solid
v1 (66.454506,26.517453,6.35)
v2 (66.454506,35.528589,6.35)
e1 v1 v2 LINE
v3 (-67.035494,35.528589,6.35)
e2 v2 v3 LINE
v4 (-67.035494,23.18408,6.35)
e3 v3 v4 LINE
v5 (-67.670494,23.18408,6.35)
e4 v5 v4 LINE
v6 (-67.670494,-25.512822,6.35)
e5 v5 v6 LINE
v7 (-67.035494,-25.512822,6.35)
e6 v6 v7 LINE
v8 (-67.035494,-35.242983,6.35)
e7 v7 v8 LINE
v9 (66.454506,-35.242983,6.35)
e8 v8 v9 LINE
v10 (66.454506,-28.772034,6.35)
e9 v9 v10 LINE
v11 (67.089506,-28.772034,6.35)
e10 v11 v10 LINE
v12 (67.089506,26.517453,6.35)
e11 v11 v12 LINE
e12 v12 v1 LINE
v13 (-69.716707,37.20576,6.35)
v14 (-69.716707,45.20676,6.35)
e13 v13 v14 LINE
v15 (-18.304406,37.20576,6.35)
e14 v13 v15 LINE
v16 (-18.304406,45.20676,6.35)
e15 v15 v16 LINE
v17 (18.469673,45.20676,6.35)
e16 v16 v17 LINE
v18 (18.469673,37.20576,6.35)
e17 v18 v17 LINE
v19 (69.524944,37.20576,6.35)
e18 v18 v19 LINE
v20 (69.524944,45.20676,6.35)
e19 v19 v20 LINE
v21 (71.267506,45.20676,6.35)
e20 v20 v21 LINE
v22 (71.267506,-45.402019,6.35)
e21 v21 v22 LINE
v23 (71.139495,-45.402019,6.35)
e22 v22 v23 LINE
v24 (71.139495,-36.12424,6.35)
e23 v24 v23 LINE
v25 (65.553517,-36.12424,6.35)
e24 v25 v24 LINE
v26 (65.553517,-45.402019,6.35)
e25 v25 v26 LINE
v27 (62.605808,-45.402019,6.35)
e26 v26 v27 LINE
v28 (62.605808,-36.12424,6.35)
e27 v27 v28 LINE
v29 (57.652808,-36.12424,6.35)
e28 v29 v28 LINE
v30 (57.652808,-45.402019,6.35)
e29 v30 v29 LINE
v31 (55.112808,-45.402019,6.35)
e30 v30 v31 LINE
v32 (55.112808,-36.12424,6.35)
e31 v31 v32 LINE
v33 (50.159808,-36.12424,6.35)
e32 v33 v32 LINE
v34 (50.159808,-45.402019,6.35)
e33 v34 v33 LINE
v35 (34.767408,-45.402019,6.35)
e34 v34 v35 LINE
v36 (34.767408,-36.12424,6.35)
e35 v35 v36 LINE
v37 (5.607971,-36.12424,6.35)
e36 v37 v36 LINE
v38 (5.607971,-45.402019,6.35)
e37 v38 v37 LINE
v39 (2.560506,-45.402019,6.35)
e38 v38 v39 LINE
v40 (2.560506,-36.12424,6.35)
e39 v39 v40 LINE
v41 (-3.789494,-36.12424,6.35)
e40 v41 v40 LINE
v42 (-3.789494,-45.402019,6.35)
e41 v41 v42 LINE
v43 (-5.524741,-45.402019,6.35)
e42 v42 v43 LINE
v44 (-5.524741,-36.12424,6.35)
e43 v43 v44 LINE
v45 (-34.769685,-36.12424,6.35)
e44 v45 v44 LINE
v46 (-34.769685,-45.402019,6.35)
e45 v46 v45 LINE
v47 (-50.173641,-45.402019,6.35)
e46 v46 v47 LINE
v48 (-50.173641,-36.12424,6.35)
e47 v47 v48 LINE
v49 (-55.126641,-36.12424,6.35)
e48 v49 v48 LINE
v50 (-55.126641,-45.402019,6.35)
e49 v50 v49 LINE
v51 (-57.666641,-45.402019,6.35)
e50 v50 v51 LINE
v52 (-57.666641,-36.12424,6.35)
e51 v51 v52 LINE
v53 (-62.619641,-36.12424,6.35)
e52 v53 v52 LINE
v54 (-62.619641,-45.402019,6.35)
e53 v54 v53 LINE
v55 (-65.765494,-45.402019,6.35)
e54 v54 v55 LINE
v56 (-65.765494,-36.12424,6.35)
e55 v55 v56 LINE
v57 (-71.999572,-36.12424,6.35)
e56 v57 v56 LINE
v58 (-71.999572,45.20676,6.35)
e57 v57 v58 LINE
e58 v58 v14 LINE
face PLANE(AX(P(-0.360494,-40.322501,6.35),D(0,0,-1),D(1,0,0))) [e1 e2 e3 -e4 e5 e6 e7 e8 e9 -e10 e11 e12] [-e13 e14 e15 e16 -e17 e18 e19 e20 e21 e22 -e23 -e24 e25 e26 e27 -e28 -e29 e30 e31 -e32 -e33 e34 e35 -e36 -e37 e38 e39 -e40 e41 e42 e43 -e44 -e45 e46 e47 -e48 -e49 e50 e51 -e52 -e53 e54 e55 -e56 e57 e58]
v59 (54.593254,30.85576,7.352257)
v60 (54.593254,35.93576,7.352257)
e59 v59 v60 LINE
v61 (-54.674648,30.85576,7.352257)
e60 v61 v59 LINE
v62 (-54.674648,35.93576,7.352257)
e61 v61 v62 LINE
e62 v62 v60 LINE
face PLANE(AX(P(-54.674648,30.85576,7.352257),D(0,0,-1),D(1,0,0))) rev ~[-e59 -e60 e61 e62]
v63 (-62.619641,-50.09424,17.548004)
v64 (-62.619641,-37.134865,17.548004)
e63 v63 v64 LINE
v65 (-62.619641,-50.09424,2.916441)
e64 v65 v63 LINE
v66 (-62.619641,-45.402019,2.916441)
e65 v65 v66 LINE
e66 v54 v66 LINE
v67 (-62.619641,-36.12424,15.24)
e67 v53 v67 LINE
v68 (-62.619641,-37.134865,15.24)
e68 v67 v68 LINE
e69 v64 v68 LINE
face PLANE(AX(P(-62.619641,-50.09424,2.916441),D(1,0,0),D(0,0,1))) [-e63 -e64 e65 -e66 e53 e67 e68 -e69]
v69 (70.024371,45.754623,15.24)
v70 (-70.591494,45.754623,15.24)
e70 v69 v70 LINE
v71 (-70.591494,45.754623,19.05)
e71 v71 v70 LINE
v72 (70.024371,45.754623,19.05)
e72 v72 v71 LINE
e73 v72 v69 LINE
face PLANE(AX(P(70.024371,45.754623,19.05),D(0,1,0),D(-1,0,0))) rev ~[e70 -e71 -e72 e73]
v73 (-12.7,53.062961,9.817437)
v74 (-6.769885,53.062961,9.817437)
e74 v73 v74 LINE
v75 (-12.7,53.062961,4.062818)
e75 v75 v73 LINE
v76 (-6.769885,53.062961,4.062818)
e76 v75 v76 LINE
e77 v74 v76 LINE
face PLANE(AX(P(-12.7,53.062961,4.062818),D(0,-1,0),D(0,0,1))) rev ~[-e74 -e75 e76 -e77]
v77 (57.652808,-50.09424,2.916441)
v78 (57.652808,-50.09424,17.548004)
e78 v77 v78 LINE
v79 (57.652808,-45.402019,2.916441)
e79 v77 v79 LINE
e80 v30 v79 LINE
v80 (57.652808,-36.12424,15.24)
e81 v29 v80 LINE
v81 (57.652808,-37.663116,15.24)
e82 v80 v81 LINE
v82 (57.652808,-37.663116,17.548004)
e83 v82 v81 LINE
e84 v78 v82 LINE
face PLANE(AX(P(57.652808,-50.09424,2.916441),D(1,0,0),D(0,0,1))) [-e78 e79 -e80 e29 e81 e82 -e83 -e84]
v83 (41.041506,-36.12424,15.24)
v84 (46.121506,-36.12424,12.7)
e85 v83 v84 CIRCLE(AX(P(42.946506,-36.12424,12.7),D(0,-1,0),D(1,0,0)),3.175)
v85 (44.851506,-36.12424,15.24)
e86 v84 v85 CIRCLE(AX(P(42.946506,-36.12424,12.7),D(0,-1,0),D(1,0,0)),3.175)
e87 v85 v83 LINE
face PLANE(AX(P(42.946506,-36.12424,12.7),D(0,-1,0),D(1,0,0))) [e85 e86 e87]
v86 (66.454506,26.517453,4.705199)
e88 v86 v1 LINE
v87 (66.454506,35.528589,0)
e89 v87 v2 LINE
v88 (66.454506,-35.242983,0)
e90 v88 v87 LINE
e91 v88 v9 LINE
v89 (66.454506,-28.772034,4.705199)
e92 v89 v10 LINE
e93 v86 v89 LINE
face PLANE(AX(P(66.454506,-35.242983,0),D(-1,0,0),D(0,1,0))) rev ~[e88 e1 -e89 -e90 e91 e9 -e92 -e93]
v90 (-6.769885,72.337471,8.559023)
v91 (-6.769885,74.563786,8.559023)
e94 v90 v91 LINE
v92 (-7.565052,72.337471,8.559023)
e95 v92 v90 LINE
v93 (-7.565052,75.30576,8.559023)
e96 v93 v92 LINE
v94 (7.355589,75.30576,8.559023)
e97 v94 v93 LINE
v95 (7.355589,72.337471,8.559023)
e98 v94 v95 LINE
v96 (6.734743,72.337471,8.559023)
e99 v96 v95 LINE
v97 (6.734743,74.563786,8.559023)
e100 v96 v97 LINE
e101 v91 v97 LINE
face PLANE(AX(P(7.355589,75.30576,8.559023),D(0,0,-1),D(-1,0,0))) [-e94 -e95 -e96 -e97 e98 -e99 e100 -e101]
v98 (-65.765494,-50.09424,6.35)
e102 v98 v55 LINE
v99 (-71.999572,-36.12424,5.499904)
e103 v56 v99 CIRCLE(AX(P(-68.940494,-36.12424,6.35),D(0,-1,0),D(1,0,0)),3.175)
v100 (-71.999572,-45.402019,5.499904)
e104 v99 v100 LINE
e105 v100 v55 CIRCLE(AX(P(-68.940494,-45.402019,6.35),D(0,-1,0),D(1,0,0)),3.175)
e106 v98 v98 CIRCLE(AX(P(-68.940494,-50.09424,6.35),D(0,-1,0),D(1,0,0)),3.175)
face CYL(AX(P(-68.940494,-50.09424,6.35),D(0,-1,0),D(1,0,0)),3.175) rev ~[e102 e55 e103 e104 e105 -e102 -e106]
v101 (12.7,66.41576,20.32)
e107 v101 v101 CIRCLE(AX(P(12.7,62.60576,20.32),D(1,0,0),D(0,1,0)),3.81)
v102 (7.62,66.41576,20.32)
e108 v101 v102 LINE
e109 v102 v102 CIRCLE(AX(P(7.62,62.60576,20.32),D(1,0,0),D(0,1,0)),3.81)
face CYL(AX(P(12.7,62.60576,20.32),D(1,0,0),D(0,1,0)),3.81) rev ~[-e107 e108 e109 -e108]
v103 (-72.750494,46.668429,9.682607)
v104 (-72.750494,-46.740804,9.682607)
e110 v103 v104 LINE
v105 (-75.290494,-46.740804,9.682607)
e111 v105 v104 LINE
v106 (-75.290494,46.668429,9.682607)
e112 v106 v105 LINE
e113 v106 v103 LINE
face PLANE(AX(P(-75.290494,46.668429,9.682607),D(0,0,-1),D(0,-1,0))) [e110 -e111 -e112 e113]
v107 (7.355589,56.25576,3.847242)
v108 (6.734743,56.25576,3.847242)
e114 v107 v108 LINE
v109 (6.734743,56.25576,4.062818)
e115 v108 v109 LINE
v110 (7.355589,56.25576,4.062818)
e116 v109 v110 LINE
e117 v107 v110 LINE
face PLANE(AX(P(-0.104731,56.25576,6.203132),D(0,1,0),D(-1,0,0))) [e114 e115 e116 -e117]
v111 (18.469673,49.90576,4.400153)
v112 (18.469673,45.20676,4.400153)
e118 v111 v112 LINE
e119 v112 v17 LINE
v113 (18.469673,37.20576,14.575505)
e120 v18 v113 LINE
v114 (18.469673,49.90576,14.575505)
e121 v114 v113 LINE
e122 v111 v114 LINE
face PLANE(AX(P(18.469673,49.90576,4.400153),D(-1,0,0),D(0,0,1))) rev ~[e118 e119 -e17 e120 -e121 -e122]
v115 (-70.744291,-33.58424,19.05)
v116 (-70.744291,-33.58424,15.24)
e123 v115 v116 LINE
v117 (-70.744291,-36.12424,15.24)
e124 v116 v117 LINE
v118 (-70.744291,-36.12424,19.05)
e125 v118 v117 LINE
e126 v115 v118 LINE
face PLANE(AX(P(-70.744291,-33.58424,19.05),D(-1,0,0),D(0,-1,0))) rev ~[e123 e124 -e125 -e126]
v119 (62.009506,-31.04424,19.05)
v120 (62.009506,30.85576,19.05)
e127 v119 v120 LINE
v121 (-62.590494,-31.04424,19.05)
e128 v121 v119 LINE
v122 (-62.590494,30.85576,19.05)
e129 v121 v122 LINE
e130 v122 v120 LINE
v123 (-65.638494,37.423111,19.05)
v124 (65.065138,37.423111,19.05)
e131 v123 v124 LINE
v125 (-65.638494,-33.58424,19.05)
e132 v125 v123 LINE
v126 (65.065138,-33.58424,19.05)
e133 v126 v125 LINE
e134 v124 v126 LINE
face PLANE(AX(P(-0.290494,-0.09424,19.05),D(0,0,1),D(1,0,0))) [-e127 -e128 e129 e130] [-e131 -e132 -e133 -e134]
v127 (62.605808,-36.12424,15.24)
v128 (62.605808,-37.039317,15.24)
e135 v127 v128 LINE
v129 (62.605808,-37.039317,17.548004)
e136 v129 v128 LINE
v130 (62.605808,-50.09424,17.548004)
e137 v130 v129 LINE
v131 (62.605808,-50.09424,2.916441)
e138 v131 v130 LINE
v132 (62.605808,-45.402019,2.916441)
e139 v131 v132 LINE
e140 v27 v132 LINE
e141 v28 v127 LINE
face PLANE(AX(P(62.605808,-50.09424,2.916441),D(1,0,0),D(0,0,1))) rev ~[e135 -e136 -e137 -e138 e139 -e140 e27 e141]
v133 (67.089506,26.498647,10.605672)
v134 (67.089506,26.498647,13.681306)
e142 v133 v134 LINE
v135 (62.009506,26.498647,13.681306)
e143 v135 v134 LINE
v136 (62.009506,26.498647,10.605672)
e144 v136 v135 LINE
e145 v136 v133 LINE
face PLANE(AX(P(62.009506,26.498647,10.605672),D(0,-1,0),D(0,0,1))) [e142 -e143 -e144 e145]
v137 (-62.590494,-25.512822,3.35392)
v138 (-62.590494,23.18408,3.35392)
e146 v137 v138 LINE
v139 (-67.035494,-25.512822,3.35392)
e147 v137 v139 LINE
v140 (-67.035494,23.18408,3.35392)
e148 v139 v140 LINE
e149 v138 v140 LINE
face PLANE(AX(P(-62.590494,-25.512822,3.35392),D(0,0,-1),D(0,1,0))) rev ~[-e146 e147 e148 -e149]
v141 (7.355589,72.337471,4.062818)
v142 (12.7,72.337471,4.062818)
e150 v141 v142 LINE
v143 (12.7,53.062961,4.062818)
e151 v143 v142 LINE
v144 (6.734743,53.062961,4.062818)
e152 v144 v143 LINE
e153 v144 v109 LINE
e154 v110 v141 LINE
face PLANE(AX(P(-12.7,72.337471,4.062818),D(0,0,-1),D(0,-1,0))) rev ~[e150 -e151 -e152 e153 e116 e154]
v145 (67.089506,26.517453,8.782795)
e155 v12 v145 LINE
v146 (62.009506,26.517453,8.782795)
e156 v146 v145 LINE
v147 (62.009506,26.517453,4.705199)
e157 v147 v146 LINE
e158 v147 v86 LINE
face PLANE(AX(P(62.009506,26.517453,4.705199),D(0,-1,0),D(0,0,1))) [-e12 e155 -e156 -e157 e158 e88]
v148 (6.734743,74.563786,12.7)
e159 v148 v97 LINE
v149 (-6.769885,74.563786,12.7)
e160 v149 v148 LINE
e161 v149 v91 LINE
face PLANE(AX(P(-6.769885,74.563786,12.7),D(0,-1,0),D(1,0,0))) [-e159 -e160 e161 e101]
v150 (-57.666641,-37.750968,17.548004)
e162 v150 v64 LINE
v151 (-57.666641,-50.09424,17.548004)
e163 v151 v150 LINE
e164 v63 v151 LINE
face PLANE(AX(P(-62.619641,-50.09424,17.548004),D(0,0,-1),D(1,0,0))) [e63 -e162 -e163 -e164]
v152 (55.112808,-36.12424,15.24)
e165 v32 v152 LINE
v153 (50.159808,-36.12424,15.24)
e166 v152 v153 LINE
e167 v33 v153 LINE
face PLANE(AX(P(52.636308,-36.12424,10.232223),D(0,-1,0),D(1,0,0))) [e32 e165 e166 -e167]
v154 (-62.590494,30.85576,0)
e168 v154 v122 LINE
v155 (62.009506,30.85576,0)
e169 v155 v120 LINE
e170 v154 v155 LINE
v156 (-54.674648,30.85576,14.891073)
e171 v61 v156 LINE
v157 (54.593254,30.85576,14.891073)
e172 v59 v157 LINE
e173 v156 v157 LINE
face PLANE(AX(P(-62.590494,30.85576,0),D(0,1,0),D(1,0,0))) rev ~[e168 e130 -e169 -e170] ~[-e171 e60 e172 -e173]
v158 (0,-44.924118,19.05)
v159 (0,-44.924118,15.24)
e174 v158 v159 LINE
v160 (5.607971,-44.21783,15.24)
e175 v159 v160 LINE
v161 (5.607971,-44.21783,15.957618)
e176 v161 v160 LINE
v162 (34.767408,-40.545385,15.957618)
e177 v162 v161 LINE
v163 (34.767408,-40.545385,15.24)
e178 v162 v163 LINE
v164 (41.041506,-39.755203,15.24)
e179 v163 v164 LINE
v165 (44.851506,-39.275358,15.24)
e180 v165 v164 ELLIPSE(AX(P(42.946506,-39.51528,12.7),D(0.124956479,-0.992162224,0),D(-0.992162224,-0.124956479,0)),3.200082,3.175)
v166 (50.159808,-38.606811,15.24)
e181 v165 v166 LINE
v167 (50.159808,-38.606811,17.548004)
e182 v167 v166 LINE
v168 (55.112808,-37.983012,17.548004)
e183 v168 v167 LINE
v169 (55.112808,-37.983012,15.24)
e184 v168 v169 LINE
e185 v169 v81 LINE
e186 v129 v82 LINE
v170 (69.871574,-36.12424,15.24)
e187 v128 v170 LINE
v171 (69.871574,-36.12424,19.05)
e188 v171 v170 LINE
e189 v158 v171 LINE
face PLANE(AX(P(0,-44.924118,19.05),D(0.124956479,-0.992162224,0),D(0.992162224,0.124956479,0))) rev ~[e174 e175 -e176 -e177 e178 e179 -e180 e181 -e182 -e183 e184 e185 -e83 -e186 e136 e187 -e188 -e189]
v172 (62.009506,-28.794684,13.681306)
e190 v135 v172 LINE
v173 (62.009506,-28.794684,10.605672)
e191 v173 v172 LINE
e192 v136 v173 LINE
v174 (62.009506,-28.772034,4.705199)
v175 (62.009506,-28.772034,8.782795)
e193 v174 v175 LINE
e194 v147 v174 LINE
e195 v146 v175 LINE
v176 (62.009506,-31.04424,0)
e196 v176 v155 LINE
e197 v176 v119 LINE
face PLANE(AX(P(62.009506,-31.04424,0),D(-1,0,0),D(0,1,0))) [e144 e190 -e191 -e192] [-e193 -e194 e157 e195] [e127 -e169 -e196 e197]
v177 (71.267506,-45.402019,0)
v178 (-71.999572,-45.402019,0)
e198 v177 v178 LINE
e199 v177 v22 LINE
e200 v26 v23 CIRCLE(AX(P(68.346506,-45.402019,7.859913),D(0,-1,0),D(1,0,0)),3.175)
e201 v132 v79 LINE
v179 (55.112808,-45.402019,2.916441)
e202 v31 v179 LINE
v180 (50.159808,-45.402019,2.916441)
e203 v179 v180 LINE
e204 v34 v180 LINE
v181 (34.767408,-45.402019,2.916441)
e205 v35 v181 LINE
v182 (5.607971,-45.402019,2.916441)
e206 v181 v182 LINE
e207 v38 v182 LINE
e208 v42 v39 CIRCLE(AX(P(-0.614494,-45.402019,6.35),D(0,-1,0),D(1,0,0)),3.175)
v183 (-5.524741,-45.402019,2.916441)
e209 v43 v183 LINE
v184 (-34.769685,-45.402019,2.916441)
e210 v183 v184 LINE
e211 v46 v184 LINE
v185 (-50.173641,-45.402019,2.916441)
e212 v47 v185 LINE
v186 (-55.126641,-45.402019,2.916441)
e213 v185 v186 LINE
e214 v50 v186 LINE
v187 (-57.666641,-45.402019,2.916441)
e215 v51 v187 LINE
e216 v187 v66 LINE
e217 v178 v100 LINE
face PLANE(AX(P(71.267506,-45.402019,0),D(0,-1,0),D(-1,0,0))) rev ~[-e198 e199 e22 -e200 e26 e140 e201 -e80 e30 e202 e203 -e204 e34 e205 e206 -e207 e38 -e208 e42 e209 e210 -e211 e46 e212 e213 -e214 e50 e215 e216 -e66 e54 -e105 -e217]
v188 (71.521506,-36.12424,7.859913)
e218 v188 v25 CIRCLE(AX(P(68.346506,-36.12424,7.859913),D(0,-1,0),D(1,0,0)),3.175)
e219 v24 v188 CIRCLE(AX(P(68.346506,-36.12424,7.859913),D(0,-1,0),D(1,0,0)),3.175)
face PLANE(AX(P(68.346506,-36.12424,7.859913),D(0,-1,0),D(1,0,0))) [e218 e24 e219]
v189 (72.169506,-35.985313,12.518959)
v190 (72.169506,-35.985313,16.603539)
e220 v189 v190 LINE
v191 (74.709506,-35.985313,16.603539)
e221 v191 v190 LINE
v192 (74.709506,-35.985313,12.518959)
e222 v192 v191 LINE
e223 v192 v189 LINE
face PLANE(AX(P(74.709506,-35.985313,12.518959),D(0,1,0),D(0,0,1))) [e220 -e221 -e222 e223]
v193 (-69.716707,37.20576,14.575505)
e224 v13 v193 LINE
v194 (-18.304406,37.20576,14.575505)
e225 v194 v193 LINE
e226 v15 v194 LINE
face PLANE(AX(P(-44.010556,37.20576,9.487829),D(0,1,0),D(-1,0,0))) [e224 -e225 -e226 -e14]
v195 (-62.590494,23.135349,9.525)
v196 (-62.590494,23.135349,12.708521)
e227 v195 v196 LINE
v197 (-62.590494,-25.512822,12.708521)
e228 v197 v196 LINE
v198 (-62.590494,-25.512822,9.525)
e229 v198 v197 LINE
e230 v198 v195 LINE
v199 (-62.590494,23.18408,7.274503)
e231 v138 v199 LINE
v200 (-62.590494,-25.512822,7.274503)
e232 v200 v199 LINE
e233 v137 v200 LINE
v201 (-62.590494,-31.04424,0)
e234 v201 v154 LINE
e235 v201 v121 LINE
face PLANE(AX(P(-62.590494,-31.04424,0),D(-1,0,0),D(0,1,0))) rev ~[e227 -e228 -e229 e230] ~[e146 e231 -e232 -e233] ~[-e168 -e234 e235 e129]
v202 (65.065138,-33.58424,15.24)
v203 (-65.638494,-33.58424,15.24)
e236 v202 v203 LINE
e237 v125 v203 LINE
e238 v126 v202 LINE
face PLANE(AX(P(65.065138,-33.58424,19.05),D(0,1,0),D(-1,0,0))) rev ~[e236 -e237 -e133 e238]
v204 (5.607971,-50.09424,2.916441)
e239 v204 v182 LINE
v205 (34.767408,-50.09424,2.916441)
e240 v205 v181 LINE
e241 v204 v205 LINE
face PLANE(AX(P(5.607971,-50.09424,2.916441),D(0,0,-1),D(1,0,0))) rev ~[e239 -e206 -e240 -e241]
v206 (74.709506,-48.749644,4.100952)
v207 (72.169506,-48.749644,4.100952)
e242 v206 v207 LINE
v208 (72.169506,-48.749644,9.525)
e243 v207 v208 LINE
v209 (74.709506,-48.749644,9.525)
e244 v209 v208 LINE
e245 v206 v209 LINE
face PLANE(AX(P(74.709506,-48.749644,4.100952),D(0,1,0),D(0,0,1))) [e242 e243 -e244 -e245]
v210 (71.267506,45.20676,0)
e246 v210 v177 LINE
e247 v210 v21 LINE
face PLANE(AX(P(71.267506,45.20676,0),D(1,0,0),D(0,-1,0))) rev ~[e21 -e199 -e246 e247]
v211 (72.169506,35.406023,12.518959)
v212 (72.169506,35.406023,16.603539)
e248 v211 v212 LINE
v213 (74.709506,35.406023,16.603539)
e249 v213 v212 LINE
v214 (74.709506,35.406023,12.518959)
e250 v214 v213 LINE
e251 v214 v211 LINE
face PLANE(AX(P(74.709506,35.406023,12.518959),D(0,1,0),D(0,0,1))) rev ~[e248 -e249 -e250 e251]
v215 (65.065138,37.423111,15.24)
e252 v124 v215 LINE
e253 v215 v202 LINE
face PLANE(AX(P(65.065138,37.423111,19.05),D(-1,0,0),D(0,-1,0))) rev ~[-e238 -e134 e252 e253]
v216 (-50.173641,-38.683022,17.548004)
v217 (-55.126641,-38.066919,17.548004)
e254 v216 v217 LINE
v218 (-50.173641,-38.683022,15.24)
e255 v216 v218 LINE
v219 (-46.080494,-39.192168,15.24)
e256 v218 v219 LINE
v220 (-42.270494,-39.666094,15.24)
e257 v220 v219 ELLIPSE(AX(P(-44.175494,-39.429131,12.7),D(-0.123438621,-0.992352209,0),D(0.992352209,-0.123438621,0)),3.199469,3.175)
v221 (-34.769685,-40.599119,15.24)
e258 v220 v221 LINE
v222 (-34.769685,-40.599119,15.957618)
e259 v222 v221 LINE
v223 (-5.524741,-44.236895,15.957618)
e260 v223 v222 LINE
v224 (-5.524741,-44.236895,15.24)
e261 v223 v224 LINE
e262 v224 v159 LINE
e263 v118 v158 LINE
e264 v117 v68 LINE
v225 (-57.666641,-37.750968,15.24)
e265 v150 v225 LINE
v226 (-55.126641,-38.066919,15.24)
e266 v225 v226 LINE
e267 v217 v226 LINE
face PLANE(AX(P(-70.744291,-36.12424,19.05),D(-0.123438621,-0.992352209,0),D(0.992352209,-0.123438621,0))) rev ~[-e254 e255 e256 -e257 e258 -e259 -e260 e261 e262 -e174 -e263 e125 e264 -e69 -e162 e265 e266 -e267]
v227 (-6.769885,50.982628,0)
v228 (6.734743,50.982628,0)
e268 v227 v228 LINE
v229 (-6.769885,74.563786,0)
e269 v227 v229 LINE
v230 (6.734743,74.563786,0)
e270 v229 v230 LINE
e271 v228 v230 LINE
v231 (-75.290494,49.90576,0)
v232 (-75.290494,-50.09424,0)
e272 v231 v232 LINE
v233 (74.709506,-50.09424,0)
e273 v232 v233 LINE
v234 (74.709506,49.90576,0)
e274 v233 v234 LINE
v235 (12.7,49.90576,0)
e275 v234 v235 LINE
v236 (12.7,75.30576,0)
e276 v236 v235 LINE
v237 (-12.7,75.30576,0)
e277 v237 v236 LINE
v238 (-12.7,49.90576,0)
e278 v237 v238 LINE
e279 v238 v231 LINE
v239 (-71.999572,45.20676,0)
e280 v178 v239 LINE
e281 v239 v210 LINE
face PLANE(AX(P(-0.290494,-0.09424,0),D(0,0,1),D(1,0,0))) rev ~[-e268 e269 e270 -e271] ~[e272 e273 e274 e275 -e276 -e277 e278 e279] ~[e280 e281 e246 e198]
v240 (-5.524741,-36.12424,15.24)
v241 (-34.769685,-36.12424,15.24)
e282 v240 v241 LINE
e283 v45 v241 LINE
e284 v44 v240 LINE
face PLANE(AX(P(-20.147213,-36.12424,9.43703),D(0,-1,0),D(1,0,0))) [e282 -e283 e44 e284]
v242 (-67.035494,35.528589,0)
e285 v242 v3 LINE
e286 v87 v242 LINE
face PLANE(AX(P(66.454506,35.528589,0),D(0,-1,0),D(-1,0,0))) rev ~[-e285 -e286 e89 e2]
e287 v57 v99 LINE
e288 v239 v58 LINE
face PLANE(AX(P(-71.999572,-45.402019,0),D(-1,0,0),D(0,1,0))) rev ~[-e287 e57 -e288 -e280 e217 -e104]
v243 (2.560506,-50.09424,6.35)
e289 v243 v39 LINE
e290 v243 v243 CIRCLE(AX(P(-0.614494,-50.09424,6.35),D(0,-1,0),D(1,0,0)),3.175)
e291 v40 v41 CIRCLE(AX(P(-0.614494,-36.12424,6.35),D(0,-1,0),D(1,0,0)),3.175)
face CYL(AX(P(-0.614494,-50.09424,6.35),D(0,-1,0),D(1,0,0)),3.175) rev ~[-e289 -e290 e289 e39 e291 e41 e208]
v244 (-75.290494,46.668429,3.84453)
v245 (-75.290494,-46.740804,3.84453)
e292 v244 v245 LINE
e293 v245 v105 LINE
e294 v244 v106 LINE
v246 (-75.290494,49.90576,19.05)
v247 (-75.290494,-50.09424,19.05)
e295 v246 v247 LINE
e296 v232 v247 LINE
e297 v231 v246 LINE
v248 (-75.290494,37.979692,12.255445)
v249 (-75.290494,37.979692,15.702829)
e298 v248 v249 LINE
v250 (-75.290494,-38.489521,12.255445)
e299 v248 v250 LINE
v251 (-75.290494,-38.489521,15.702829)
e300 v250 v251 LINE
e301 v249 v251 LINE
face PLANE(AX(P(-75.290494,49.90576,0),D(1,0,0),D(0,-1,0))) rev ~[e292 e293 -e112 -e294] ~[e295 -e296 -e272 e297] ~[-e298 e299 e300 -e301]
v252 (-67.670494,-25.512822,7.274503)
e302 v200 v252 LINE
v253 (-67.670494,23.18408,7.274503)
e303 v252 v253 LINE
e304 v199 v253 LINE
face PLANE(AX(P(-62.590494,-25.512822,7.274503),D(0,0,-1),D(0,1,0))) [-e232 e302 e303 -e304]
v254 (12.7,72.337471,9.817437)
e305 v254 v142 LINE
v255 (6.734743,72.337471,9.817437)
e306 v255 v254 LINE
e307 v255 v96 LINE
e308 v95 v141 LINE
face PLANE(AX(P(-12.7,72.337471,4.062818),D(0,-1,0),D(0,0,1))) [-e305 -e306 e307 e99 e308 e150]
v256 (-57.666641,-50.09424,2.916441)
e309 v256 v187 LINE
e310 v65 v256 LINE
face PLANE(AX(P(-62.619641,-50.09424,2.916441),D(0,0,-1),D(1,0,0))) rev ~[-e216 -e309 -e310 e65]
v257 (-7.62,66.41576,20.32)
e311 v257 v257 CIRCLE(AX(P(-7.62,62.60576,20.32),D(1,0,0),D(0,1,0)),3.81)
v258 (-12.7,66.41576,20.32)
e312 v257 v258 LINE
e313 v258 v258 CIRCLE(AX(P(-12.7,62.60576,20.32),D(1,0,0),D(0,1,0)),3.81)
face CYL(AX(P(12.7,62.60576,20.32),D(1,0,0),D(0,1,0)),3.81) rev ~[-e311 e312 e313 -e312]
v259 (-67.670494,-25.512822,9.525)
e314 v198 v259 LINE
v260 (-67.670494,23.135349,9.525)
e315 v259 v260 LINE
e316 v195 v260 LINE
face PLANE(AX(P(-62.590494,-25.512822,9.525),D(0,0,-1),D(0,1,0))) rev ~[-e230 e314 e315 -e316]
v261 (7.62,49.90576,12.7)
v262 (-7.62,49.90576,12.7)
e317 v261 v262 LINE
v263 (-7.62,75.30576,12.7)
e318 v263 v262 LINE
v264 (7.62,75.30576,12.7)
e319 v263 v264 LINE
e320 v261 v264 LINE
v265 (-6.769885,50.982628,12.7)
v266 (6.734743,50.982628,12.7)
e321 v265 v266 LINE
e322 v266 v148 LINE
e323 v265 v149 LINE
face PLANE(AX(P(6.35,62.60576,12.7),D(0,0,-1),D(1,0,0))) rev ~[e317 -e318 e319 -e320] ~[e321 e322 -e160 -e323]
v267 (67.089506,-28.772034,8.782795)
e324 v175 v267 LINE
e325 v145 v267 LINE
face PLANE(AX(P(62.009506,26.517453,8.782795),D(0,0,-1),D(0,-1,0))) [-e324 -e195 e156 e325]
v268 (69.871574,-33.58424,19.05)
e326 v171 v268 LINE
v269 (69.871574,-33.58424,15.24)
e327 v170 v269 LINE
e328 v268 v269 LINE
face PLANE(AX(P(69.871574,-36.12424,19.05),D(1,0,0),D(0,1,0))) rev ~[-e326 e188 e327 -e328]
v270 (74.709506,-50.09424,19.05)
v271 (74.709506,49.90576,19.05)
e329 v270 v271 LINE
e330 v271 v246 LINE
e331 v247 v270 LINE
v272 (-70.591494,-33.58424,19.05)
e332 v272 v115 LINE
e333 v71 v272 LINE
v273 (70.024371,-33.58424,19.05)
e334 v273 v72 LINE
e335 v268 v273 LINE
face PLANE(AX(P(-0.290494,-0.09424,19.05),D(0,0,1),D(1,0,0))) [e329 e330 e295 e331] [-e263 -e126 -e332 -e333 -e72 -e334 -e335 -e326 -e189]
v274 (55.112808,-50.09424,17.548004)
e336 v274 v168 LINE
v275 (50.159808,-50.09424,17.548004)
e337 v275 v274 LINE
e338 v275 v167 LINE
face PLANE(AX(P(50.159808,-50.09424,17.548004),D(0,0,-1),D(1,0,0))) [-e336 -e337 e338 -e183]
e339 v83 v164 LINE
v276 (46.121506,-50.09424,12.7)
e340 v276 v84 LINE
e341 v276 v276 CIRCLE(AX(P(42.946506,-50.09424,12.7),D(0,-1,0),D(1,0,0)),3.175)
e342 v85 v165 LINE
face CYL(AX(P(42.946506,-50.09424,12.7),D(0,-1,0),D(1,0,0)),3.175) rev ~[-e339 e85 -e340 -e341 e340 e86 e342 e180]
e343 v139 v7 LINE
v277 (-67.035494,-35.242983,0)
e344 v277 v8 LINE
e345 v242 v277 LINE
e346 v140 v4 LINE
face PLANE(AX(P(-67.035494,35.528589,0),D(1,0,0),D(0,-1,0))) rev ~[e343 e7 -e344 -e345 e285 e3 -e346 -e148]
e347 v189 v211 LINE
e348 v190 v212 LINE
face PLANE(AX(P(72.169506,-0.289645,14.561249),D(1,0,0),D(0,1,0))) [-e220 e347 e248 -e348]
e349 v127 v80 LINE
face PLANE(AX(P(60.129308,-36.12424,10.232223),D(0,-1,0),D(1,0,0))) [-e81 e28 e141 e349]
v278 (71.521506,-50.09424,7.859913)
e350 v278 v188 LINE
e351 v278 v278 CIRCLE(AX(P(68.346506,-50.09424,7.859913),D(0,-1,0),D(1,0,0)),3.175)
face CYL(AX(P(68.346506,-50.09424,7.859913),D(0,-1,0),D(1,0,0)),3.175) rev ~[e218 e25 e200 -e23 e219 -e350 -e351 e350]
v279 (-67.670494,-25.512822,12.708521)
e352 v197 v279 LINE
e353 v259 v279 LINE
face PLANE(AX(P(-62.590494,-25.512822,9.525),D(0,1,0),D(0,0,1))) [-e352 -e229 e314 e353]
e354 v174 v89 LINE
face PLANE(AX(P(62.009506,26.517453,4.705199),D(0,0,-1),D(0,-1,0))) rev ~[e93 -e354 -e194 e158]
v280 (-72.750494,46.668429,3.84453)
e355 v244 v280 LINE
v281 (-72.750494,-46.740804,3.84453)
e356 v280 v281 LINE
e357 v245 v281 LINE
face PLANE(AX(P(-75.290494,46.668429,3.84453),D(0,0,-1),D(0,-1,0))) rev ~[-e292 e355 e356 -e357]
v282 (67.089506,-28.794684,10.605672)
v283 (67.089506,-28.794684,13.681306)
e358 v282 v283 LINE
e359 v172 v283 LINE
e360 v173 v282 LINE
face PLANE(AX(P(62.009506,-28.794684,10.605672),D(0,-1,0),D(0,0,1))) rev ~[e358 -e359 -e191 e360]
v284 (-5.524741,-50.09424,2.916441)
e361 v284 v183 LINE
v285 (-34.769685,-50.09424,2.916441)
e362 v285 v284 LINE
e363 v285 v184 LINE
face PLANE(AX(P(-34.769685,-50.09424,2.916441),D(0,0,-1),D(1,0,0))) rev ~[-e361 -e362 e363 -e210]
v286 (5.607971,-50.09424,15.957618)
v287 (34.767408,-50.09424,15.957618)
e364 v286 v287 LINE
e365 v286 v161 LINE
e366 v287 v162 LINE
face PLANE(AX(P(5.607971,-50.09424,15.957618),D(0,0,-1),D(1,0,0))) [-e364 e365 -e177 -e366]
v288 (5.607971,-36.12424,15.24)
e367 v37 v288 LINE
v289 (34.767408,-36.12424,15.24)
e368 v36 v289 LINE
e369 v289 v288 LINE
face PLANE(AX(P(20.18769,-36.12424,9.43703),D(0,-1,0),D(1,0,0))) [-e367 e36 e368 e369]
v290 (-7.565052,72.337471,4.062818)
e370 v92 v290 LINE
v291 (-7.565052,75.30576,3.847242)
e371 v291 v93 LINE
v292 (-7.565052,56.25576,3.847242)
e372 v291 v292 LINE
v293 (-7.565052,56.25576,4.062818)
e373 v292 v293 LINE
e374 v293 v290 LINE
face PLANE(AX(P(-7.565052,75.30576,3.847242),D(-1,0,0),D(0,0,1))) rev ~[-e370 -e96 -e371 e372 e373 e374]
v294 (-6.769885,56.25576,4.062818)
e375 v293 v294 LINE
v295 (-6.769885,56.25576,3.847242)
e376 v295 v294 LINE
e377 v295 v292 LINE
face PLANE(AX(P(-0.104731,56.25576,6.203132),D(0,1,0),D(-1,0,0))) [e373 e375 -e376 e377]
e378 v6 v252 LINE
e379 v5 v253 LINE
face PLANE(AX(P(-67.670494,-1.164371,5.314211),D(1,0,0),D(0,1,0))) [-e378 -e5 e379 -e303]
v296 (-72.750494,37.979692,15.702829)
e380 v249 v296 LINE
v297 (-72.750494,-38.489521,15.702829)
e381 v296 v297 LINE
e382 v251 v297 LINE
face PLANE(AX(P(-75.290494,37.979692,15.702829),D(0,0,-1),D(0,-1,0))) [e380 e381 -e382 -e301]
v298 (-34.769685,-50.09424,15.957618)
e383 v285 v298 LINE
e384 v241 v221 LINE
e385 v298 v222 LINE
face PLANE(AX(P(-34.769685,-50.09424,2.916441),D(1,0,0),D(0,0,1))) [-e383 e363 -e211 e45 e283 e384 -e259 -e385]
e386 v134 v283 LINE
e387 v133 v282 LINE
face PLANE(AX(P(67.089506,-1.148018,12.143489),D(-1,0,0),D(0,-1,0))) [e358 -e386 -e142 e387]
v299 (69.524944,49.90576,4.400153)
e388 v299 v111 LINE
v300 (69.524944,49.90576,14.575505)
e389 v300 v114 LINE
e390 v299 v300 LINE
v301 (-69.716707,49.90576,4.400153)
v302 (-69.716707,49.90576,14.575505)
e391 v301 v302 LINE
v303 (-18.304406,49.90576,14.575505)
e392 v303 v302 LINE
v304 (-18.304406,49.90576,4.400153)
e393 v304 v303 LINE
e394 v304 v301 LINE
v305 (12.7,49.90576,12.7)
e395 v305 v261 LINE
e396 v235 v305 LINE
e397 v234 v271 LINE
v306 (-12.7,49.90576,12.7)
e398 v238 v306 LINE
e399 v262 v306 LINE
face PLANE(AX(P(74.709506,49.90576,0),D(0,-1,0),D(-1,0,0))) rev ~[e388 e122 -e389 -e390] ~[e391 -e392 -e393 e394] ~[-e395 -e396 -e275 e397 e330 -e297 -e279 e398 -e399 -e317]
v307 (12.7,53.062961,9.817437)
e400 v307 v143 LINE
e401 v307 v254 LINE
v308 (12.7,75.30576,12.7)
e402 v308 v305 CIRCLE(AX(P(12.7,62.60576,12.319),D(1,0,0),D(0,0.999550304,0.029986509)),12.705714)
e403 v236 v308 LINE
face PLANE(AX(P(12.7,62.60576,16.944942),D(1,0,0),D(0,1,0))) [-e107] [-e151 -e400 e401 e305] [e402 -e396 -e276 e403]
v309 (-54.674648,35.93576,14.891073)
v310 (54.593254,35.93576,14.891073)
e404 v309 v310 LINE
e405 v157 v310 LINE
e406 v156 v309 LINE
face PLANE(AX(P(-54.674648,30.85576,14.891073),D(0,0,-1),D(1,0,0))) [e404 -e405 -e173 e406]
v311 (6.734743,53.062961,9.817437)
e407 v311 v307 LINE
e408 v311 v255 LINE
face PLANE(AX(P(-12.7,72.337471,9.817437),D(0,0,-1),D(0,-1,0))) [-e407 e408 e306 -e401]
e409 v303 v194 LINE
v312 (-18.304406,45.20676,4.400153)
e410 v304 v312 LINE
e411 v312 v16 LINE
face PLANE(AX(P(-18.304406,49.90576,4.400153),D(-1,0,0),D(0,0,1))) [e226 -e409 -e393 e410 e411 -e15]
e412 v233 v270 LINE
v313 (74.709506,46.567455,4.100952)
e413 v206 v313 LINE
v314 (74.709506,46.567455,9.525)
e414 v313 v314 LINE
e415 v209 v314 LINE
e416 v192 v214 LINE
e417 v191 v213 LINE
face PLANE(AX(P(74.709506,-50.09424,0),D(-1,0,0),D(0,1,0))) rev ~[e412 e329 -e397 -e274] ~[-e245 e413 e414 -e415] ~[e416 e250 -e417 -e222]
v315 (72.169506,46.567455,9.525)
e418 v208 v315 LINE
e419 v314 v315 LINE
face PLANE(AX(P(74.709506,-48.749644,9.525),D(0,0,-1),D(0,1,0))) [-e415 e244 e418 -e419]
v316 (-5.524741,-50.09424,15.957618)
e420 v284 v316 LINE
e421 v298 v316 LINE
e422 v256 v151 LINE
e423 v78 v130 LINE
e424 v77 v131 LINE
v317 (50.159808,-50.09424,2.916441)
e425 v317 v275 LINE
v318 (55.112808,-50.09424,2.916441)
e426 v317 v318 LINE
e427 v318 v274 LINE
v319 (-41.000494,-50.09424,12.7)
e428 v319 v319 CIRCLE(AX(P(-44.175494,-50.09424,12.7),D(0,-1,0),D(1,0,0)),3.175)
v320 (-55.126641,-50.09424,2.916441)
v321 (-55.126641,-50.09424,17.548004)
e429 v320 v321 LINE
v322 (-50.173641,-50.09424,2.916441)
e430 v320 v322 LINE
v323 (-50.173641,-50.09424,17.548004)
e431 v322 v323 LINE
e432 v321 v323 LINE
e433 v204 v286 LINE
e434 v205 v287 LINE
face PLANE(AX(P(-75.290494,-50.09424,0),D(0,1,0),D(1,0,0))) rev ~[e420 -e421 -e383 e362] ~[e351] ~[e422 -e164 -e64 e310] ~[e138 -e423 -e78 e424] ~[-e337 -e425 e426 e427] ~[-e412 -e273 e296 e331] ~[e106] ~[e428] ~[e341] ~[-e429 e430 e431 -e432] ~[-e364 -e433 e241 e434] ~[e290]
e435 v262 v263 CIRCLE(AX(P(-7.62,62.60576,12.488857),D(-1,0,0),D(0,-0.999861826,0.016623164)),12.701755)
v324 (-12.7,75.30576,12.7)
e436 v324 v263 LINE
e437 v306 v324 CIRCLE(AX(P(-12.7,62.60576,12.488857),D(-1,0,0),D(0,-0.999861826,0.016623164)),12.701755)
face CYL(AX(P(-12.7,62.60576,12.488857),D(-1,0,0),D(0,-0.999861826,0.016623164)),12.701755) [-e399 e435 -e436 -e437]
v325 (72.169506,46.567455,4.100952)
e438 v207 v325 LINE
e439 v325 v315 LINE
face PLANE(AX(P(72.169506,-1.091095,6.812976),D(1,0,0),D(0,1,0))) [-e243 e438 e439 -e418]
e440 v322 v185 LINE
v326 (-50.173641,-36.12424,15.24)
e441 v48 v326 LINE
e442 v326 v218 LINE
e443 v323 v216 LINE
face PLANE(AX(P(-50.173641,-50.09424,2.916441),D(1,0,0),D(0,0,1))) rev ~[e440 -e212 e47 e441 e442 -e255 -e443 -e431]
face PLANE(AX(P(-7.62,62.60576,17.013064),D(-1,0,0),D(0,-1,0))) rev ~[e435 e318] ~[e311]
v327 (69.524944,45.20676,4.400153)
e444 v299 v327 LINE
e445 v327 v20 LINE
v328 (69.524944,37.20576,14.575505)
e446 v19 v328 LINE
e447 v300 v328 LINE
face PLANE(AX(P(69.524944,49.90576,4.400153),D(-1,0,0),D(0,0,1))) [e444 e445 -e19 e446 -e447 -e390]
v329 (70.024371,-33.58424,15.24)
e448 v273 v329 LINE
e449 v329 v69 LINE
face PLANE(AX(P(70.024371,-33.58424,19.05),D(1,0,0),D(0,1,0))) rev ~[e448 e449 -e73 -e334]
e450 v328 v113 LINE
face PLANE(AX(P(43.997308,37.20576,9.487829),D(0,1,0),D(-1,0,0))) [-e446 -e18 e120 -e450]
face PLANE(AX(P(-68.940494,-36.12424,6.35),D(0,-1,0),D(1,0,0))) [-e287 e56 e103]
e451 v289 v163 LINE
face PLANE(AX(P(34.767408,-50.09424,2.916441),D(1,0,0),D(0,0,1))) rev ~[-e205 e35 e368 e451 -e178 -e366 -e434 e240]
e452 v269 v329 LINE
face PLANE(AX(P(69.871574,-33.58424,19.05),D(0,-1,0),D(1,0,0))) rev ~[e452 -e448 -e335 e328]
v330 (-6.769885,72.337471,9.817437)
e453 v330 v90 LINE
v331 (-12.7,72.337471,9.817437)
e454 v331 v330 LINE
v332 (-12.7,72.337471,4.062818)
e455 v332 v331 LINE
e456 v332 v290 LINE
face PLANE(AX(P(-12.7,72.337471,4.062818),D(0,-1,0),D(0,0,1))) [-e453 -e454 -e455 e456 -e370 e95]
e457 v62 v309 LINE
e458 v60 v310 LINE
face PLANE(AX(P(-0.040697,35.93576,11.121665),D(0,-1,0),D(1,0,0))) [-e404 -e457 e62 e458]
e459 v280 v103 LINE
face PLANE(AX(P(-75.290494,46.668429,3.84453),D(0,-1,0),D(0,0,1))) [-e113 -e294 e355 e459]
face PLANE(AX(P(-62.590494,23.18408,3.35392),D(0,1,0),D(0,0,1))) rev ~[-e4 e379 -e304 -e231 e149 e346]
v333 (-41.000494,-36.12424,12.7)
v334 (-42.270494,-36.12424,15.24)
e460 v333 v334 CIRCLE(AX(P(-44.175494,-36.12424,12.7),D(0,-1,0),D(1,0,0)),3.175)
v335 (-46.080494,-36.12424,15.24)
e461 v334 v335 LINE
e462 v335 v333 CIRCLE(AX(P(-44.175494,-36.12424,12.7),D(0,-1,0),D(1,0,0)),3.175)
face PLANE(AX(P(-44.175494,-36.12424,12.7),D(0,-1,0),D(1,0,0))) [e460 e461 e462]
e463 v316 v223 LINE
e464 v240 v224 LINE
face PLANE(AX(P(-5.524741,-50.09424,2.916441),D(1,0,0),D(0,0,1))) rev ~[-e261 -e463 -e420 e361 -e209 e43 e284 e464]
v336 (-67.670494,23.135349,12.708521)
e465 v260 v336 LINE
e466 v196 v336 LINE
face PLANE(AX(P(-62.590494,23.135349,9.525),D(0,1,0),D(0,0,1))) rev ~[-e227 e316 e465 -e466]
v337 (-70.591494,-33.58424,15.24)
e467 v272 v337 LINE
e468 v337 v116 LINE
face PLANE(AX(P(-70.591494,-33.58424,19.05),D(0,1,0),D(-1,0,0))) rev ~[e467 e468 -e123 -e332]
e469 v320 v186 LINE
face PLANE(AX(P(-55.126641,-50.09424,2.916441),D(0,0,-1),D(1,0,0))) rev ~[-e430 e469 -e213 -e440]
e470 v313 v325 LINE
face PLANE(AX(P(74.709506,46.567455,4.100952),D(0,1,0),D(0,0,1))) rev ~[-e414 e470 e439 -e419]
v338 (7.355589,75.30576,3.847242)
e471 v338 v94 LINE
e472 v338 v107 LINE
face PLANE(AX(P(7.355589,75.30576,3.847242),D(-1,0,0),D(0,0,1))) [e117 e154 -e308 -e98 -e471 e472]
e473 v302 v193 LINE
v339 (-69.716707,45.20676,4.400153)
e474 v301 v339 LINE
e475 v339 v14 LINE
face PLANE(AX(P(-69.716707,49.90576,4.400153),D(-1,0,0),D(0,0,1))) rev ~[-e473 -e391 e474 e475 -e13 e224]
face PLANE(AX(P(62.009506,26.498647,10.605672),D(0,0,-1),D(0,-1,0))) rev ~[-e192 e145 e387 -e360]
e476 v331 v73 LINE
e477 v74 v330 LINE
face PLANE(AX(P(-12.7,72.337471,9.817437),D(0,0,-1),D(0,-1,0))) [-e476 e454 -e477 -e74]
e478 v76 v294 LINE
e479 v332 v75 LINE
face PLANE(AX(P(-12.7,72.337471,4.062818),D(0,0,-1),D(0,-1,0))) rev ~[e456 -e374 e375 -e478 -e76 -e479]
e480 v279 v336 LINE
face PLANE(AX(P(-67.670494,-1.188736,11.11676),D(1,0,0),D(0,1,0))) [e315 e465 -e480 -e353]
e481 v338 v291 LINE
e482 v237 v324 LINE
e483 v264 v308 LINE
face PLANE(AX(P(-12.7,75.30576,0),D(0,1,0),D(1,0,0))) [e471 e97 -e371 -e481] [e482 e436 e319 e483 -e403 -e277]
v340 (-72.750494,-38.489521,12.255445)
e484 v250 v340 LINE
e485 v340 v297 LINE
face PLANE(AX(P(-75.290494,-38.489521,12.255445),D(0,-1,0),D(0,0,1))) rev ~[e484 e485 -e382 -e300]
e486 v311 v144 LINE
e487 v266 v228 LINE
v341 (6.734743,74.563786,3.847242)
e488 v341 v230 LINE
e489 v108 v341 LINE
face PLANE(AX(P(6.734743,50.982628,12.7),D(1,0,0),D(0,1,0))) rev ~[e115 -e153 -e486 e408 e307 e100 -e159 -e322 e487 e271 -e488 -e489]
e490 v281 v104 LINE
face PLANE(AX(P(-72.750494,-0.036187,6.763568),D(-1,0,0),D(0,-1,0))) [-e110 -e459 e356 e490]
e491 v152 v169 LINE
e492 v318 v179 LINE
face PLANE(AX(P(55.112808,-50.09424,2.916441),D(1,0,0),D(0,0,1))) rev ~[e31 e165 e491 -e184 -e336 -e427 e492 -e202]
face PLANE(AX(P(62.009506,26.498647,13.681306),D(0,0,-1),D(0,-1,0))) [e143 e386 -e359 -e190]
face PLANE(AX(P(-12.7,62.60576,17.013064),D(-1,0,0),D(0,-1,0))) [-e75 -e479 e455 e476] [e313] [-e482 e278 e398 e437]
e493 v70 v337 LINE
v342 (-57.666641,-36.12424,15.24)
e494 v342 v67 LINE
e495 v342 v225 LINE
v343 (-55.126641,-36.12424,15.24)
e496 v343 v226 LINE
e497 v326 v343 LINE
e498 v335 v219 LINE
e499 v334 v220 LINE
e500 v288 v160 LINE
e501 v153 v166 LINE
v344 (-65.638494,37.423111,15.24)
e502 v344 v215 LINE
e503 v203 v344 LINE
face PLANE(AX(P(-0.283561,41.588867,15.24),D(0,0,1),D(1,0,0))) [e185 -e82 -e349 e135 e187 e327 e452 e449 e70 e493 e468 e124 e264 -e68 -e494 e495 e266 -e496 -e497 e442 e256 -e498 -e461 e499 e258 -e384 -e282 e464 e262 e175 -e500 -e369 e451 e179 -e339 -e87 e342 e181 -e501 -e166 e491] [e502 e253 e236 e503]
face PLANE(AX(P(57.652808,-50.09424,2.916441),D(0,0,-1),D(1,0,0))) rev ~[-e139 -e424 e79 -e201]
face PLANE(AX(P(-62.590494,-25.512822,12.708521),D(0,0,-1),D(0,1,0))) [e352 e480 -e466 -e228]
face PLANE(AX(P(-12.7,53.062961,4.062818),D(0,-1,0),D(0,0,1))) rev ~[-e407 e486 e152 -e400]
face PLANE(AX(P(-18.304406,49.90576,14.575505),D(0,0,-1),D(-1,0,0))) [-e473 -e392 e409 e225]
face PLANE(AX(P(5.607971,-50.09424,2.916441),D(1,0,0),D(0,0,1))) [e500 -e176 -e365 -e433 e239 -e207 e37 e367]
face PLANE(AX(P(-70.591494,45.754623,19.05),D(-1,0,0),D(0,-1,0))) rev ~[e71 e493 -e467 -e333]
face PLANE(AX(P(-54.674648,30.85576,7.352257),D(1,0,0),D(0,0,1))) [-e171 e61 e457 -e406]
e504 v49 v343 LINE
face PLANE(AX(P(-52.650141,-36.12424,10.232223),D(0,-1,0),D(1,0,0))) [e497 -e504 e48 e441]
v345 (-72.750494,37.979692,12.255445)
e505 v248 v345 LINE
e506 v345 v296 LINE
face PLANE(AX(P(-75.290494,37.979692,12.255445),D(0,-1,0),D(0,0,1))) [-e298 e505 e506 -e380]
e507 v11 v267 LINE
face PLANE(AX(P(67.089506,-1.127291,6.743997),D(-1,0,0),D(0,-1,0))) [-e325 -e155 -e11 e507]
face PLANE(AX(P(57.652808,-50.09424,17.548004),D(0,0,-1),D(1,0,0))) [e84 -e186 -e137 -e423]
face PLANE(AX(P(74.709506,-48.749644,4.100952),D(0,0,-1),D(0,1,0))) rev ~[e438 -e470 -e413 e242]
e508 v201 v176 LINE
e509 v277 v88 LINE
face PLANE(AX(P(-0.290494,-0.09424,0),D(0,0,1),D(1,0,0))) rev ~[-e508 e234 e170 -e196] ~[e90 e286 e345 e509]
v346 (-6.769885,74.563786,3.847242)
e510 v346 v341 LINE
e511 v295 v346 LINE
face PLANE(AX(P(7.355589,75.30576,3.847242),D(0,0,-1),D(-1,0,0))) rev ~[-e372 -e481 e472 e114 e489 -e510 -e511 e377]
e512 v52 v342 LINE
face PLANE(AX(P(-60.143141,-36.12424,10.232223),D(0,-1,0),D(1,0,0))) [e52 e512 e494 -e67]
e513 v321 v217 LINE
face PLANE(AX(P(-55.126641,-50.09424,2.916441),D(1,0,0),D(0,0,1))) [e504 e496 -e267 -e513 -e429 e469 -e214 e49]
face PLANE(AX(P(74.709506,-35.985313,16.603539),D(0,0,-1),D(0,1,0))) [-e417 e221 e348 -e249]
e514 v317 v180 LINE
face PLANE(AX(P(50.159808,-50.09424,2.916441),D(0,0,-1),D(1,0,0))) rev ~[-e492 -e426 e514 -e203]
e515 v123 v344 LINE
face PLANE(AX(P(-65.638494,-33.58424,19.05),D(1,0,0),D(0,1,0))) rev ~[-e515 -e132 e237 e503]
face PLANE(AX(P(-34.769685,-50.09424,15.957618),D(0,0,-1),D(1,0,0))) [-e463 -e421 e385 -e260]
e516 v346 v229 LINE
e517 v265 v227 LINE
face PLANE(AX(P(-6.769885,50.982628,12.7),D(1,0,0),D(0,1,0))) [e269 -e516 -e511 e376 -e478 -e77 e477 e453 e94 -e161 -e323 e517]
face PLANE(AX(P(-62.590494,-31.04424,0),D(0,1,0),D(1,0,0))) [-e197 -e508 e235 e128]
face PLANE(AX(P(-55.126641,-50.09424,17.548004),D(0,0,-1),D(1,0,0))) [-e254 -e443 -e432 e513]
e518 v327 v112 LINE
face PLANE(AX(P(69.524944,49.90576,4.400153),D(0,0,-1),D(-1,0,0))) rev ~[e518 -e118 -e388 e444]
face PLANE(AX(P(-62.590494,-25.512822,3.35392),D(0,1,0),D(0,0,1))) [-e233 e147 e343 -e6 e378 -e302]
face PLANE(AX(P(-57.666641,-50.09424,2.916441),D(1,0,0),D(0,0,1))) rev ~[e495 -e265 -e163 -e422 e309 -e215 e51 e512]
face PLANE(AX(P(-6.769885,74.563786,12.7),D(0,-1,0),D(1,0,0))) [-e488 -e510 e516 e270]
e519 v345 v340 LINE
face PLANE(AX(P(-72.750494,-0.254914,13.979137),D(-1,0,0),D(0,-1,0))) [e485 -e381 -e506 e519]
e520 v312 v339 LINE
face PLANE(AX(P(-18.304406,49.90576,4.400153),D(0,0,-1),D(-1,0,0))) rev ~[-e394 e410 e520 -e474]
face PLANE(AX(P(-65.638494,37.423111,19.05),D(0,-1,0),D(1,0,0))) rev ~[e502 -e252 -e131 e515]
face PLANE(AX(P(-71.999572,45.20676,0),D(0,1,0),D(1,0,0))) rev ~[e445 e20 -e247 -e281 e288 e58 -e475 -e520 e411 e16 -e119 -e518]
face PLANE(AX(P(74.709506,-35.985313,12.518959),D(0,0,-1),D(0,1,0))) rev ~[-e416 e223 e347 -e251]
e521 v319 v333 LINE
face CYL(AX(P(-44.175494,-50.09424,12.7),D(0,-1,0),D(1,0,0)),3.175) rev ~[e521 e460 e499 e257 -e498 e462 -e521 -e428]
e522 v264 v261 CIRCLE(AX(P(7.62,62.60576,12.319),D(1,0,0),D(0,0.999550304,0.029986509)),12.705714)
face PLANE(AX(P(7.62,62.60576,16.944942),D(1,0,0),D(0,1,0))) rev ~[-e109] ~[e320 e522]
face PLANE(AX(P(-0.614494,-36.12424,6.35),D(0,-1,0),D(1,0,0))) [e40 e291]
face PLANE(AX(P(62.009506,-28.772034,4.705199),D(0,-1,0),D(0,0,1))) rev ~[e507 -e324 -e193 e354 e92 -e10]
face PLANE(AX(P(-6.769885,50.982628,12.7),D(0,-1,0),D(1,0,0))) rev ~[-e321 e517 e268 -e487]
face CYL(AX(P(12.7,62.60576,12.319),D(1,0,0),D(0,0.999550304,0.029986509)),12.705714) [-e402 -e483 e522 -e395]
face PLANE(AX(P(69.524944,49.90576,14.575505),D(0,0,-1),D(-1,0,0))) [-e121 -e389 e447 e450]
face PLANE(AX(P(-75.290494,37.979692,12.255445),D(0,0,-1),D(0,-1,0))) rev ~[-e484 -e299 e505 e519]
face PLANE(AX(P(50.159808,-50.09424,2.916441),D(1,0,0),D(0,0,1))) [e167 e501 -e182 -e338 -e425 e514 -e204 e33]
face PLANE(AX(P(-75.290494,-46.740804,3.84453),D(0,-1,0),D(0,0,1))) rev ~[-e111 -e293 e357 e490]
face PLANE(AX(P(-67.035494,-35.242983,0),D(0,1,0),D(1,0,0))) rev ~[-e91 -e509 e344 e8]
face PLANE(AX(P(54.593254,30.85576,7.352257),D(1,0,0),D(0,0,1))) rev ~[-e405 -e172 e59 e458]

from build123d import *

# Parameters (mm, degrees)
F0_W      = 124.6
F0_H      = 61.9
F1_DEPTH  = 19.05
F2_W      = 4.953
F2_H      = 14.6315630991
F2_W_2    = 29.2449435338
F2_H_2    = 13.041177066
F2_W_3    = 29.159436468
F2_R      = 3.175
F3_DEPTH  = 13.97
F5_DEPTH  = 6.35
F6_W      = 12.7
F6_H      = 25.4
F7_DEPTH  = 12.7
F8_W      = 4.953
F8_H      = 71.0073517896
F9_DEPTH  = 3.81
F10_R     = 3.81
F11_DEPTH = 5.08
F13_DEPTH = 5.08
F14_DEPTH = 31.75
F16_W     = 13.5046280921
F16_H     = 23.5811583698
F17_DEPTH = 25.4
F18_W     = 19.2745104432
F18_H     = 5.7546193711
F19_DEPTH = 31.75
F20_W     = 14.9206416681
F20_H     = 4.7117811628
F21_DEPTH = 19.05
F22_W     = 51.0552711785
F22_H     = 10.1753515191
F22_W_2   = 51.412301138
F23_DEPTH = 12.7
F24_W     = 93.4092327952
F24_H     = 5.8380772825
F24_W_2   = 76.4692127705
F24_H_2   = 3.4473836422
F25_DEPTH = 2.54
F26_W     = 95.3170992434
F26_H     = 5.4240481682
F26_W_2   = 71.3913366199
F26_H_2   = 4.0845796466
F27_DEPTH = 2.54
F28_W     = 109.2679016292
F28_H     = 7.5388159603
F29_DEPTH = 5.08
F30_W     = 48.6481711268
F30_H     = 3.1835205168
F30_W_2   = 48.6969016492
F30_H_2   = 3.9205837529
F31_DEPTH = 5.08
F32_W     = 55.2894864231
F32_H     = 4.0775961243
F32_W_2   = 55.2933309227
F32_H_2   = 3.075633198
F33_DEPTH = 5.08


# Not quite as in the source:
# - a feature names something its author has since deleted; it is built from what else it names


with BuildPart() as f1:
    # F0 (on Top) → F1 (new body)
    with BuildSketch(Plane.XY):
        Polygon((-75.2904937168, 49.9057597088), (-75.2904937168, -50.0942402912), (-42.6597435957, -50.0942402912), (67.6151300783, -50.0942402912), (74.7095062832, -50.0942402912), (74.7095062832, 49.9057597088), (-0.2904937168, 49.9057597088), (-25.810170721, 49.9057597088), (-50.4447113996, 49.9057597088), align=None)
        with Locations((-0.2904937168, -0.0942402912)):
            Rectangle(F0_W, F0_H, mode=Mode.SUBTRACT)
    extrude(amount=F1_DEPTH)

    # F2 (on face) → F3 (cut)
    with BuildSketch(Plane.XZ.offset(50.0942402912)):
        with Locations((-60.1431414232, 10.2322226157)):
            Rectangle(F2_W, F2_H)
        with Locations((-52.6501414232, 10.2322226157)):
            Rectangle(F2_W, F2_H)
        with Locations((-20.147212787, 9.4370295992)):
            Rectangle(F2_W_2, F2_H_2)
        with Locations((20.1876896899, 9.4370295992)):
            Rectangle(F2_W_3, F2_H_2)
        with Locations((52.6363079239, 10.2322226157)):
            Rectangle(F2_W, F2_H)
        with Locations((60.1293079239, 10.2322226157)):
            Rectangle(F2_W, F2_H)
        with Locations((-44.1754937168, 12.7)):
            Circle(F2_R)
        with Locations((-0.6144937168, 6.35)):
            Circle(F2_R)
        with Locations((42.9465062832, 12.7)):
            Circle(F2_R)
        with Locations((68.3465062832, 7.8599134153)):
            Circle(F2_R)
        with Locations((-68.9404937168, 6.35)):
            Circle(F2_R)
    extrude(amount=-F3_DEPTH, mode=Mode.SUBTRACT)

    # F4 (on face) → F5 (cut)
    with BuildSketch(Plane(origin=(0, 0, 0), x_dir=(1, 0, 0), z_dir=(0, 0, -1))):
        Polygon((66.3145062832, 45.4020188174), (-67.0354937168, 45.4020188174), (-67.0354937168, 35.2429834301), (-61.1156715149, 35.2429834301), (60.9613691041, 35.2429834301), (66.3145062832, 35.2429834301), align=None)
        Polygon((-67.0354937168, 35.2429834301), (-67.0354937168, 45.4020188174), (-71.9995722175, 45.4020188174), (-71.9995722175, -45.2067597088), (-67.0354937168, -45.2067597088), (-67.0354937168, -35.52858904), align=None)
        Polygon((71.2675062832, 45.4020188174), (66.3145062832, 45.4020188174), (66.3145062832, 35.2429834301), (66.4545062832, 35.2429834301), (66.4545062832, -35.52858904), (66.4545062832, -45.2067597088), (71.2675062832, -45.2067597088), align=None)
        Polygon((60.9613691041, -35.52858904), (-67.0354937168, -35.52858904), (-67.0354937168, -45.2067597088), (66.4545062832, -45.2067597088), (66.4545062832, -35.52858904), align=None)
    extrude(amount=-F5_DEPTH, mode=Mode.SUBTRACT)

    # F6 (on face) → F7 (join)
    with BuildSketch(Plane(origin=(0, 0, 0), x_dir=(1, 0, 0), z_dir=(0, 0, -1))):
        with Locations((6.35, -62.6057597088)):
            Rectangle(F6_W, F6_H)
        with Locations((-6.35, -62.6057597088)):
            Rectangle(F6_W, F6_H)
    extrude(amount=-F7_DEPTH)

    # F8 (on face) → F9 (cut)
    with BuildSketch(Plane.XY.offset(19.05)):
        Polygon((70.0243711472, 45.754622668), (-70.5914937168, 45.754622668), (-70.5914937168, 37.4231114984), (-65.6384937168, 37.4231114984), (65.065138042, 37.4231114984), (70.0243711472, 37.4231114984), align=None)
        with Locations((-68.1149937168, 1.9194356036)):
            Rectangle(F8_W, F8_H)
        Polygon((70.0243711472, -33.5842402912), (70.0243711472, 37.4231114984), (65.065138042, 37.4231114984), (65.065138042, -33.5842402912), (69.871573916, -33.5842402912), align=None)
        Polygon((-65.6384937168, -33.5842402912), (-70.5914937168, -33.5842402912), (-70.7442909479, -33.5842402912), (-70.7442909479, -36.1242402912), (69.871573916, -36.1242402912), (69.871573916, -33.5842402912), (65.065138042, -33.5842402912), align=None)
        Polygon((69.871573916, -36.1242402912), (-70.7442909479, -36.1242402912), (0, -44.9241176248), align=None)
    extrude(amount=-F9_DEPTH, mode=Mode.SUBTRACT)

    # F10 (on face) → F11 (join)
    with BuildSketch(Plane.YZ.offset(12.7)):
        with BuildLine():
            Line((49.9057597088, 12.7), (75.3057597088, 12.7))
            ThreePointArc((75.3057597088, 12.7), (62.6057597088, 25.0247137147), (49.9057597088, 12.7))
        make_face()
        with Locations((62.6057597088, 20.32)):
            Circle(F10_R, mode=Mode.SUBTRACT)
        with Locations((62.6057597088, 20.32)):
            Circle(F10_R)
    extrude(amount=-F11_DEPTH)

    # F12 (on face) → F13 (join)
    with BuildSketch(Plane(origin=(-12.7, 0, 0), x_dir=(0, -1, 0), z_dir=(-1, 0, 0))):
        with BuildLine():
            Line((-75.3057597088, 12.7), (-49.9057597088, 12.7))
            ThreePointArc((-49.9057597088, 12.7), (-62.6057597088, 25.1906117041), (-75.3057597088, 12.7))
        make_face()
    extrude(amount=-F13_DEPTH)

    # F10 (on face) → F14 (cut)
    with BuildSketch(Plane.YZ.offset(12.7)):
        with Locations((62.6057597088, 20.32)):
            Circle(F10_R)
    extrude(amount=-F14_DEPTH, mode=Mode.SUBTRACT)

    # F16 (on face) → F17 (cut)
    with BuildSketch(Plane.XY.offset(12.7)):
        with Locations((-0.017571263, 62.7732072026)):
            Rectangle(F16_W, F16_H)
    extrude(amount=-F17_DEPTH, mode=Mode.SUBTRACT)

    # F18 (on face) → F19 (cut)
    with BuildSketch(Plane(origin=(-12.7, 0, 0), x_dir=(0, -1, 0), z_dir=(-1, 0, 0))):
        with Locations((-62.7002157271, 6.9401275832)):
            Rectangle(F18_W, F18_H)
    extrude(amount=-F19_DEPTH, mode=Mode.SUBTRACT)

    # F20 (on face) → F21 (cut)
    with BuildSketch(Plane(origin=(0, 75.3057597088, 0), x_dir=(-1, 0, 0), z_dir=(0, 1, 0))):
        with Locations((0.1047314145, 6.2031324487)):
            Rectangle(F20_W, F20_H)
    extrude(amount=-F21_DEPTH, mode=Mode.SUBTRACT)

    # F22 (on face) → F23 (cut)
    with BuildSketch(Plane(origin=(0, 49.9057597088, 0), x_dir=(-1, 0, 0), z_dir=(0, 1, 0))):
        with Locations((-43.9973082393, 9.4878289383)):
            Rectangle(F22_W, F22_H)
        with Locations((44.010556303, 9.4878289383)):
            Rectangle(F22_W_2, F22_H)
    extrude(amount=-F23_DEPTH, mode=Mode.SUBTRACT)

    # F24 (on face) → F25 (cut)
    with BuildSketch(Plane(origin=(-75.2904937168, 0, 0), x_dir=(0, -1, 0), z_dir=(-1, 0, 0))):
        with Locations((0.03618747, 6.7635682644)):
            Rectangle(F24_W, F24_H)
        with Locations((0.2549141645, 13.9791369438)):
            Rectangle(F24_W_2, F24_H_2)
    extrude(amount=-F25_DEPTH, mode=Mode.SUBTRACT)

    # F26 (on face) → F27 (cut)
    with BuildSketch(Plane.YZ.offset(74.7095062832)):
        with Locations((-1.0910946876, 6.8129759159)):
            Rectangle(F26_W, F26_H)
        with Locations((-0.289645046, 14.5612489432)):
            Rectangle(F26_W_2, F26_H_2)
    extrude(amount=-F27_DEPTH, mode=Mode.SUBTRACT)

    # F28 (on face) → F29 (cut)
    with BuildSketch(Plane.XZ.offset(-30.8557597088)):
        with Locations((-0.0406969339, 11.1216651276)):
            Rectangle(F28_W, F28_H)
    extrude(amount=-F29_DEPTH, mode=Mode.SUBTRACT)

    # F30 (on face) → F31 (cut)
    with BuildSketch(Plane.YZ.offset(-62.5904937168)):
        with Locations((-1.1887364089, 11.1167602584)):
            Rectangle(F30_W, F30_H)
        with Locations((-1.1643711478, 5.3142114775)):
            Rectangle(F30_W_2, F30_H_2)
    extrude(amount=-F31_DEPTH, mode=Mode.SUBTRACT)

    # F32 (on face) → F33 (cut)
    with BuildSketch(Plane(origin=(62.0095062832, 0, 0), x_dir=(0, -1, 0), z_dir=(-1, 0, 0))):
        with Locations((1.1272905394, 6.7439966369)):
            Rectangle(F32_W, F32_H)
        with Locations((1.1480180547, 12.1434889734)):
            Rectangle(F32_W_2, F32_H_2)
    extrude(amount=-F33_DEPTH, mode=Mode.SUBTRACT)


solid = f1.part
